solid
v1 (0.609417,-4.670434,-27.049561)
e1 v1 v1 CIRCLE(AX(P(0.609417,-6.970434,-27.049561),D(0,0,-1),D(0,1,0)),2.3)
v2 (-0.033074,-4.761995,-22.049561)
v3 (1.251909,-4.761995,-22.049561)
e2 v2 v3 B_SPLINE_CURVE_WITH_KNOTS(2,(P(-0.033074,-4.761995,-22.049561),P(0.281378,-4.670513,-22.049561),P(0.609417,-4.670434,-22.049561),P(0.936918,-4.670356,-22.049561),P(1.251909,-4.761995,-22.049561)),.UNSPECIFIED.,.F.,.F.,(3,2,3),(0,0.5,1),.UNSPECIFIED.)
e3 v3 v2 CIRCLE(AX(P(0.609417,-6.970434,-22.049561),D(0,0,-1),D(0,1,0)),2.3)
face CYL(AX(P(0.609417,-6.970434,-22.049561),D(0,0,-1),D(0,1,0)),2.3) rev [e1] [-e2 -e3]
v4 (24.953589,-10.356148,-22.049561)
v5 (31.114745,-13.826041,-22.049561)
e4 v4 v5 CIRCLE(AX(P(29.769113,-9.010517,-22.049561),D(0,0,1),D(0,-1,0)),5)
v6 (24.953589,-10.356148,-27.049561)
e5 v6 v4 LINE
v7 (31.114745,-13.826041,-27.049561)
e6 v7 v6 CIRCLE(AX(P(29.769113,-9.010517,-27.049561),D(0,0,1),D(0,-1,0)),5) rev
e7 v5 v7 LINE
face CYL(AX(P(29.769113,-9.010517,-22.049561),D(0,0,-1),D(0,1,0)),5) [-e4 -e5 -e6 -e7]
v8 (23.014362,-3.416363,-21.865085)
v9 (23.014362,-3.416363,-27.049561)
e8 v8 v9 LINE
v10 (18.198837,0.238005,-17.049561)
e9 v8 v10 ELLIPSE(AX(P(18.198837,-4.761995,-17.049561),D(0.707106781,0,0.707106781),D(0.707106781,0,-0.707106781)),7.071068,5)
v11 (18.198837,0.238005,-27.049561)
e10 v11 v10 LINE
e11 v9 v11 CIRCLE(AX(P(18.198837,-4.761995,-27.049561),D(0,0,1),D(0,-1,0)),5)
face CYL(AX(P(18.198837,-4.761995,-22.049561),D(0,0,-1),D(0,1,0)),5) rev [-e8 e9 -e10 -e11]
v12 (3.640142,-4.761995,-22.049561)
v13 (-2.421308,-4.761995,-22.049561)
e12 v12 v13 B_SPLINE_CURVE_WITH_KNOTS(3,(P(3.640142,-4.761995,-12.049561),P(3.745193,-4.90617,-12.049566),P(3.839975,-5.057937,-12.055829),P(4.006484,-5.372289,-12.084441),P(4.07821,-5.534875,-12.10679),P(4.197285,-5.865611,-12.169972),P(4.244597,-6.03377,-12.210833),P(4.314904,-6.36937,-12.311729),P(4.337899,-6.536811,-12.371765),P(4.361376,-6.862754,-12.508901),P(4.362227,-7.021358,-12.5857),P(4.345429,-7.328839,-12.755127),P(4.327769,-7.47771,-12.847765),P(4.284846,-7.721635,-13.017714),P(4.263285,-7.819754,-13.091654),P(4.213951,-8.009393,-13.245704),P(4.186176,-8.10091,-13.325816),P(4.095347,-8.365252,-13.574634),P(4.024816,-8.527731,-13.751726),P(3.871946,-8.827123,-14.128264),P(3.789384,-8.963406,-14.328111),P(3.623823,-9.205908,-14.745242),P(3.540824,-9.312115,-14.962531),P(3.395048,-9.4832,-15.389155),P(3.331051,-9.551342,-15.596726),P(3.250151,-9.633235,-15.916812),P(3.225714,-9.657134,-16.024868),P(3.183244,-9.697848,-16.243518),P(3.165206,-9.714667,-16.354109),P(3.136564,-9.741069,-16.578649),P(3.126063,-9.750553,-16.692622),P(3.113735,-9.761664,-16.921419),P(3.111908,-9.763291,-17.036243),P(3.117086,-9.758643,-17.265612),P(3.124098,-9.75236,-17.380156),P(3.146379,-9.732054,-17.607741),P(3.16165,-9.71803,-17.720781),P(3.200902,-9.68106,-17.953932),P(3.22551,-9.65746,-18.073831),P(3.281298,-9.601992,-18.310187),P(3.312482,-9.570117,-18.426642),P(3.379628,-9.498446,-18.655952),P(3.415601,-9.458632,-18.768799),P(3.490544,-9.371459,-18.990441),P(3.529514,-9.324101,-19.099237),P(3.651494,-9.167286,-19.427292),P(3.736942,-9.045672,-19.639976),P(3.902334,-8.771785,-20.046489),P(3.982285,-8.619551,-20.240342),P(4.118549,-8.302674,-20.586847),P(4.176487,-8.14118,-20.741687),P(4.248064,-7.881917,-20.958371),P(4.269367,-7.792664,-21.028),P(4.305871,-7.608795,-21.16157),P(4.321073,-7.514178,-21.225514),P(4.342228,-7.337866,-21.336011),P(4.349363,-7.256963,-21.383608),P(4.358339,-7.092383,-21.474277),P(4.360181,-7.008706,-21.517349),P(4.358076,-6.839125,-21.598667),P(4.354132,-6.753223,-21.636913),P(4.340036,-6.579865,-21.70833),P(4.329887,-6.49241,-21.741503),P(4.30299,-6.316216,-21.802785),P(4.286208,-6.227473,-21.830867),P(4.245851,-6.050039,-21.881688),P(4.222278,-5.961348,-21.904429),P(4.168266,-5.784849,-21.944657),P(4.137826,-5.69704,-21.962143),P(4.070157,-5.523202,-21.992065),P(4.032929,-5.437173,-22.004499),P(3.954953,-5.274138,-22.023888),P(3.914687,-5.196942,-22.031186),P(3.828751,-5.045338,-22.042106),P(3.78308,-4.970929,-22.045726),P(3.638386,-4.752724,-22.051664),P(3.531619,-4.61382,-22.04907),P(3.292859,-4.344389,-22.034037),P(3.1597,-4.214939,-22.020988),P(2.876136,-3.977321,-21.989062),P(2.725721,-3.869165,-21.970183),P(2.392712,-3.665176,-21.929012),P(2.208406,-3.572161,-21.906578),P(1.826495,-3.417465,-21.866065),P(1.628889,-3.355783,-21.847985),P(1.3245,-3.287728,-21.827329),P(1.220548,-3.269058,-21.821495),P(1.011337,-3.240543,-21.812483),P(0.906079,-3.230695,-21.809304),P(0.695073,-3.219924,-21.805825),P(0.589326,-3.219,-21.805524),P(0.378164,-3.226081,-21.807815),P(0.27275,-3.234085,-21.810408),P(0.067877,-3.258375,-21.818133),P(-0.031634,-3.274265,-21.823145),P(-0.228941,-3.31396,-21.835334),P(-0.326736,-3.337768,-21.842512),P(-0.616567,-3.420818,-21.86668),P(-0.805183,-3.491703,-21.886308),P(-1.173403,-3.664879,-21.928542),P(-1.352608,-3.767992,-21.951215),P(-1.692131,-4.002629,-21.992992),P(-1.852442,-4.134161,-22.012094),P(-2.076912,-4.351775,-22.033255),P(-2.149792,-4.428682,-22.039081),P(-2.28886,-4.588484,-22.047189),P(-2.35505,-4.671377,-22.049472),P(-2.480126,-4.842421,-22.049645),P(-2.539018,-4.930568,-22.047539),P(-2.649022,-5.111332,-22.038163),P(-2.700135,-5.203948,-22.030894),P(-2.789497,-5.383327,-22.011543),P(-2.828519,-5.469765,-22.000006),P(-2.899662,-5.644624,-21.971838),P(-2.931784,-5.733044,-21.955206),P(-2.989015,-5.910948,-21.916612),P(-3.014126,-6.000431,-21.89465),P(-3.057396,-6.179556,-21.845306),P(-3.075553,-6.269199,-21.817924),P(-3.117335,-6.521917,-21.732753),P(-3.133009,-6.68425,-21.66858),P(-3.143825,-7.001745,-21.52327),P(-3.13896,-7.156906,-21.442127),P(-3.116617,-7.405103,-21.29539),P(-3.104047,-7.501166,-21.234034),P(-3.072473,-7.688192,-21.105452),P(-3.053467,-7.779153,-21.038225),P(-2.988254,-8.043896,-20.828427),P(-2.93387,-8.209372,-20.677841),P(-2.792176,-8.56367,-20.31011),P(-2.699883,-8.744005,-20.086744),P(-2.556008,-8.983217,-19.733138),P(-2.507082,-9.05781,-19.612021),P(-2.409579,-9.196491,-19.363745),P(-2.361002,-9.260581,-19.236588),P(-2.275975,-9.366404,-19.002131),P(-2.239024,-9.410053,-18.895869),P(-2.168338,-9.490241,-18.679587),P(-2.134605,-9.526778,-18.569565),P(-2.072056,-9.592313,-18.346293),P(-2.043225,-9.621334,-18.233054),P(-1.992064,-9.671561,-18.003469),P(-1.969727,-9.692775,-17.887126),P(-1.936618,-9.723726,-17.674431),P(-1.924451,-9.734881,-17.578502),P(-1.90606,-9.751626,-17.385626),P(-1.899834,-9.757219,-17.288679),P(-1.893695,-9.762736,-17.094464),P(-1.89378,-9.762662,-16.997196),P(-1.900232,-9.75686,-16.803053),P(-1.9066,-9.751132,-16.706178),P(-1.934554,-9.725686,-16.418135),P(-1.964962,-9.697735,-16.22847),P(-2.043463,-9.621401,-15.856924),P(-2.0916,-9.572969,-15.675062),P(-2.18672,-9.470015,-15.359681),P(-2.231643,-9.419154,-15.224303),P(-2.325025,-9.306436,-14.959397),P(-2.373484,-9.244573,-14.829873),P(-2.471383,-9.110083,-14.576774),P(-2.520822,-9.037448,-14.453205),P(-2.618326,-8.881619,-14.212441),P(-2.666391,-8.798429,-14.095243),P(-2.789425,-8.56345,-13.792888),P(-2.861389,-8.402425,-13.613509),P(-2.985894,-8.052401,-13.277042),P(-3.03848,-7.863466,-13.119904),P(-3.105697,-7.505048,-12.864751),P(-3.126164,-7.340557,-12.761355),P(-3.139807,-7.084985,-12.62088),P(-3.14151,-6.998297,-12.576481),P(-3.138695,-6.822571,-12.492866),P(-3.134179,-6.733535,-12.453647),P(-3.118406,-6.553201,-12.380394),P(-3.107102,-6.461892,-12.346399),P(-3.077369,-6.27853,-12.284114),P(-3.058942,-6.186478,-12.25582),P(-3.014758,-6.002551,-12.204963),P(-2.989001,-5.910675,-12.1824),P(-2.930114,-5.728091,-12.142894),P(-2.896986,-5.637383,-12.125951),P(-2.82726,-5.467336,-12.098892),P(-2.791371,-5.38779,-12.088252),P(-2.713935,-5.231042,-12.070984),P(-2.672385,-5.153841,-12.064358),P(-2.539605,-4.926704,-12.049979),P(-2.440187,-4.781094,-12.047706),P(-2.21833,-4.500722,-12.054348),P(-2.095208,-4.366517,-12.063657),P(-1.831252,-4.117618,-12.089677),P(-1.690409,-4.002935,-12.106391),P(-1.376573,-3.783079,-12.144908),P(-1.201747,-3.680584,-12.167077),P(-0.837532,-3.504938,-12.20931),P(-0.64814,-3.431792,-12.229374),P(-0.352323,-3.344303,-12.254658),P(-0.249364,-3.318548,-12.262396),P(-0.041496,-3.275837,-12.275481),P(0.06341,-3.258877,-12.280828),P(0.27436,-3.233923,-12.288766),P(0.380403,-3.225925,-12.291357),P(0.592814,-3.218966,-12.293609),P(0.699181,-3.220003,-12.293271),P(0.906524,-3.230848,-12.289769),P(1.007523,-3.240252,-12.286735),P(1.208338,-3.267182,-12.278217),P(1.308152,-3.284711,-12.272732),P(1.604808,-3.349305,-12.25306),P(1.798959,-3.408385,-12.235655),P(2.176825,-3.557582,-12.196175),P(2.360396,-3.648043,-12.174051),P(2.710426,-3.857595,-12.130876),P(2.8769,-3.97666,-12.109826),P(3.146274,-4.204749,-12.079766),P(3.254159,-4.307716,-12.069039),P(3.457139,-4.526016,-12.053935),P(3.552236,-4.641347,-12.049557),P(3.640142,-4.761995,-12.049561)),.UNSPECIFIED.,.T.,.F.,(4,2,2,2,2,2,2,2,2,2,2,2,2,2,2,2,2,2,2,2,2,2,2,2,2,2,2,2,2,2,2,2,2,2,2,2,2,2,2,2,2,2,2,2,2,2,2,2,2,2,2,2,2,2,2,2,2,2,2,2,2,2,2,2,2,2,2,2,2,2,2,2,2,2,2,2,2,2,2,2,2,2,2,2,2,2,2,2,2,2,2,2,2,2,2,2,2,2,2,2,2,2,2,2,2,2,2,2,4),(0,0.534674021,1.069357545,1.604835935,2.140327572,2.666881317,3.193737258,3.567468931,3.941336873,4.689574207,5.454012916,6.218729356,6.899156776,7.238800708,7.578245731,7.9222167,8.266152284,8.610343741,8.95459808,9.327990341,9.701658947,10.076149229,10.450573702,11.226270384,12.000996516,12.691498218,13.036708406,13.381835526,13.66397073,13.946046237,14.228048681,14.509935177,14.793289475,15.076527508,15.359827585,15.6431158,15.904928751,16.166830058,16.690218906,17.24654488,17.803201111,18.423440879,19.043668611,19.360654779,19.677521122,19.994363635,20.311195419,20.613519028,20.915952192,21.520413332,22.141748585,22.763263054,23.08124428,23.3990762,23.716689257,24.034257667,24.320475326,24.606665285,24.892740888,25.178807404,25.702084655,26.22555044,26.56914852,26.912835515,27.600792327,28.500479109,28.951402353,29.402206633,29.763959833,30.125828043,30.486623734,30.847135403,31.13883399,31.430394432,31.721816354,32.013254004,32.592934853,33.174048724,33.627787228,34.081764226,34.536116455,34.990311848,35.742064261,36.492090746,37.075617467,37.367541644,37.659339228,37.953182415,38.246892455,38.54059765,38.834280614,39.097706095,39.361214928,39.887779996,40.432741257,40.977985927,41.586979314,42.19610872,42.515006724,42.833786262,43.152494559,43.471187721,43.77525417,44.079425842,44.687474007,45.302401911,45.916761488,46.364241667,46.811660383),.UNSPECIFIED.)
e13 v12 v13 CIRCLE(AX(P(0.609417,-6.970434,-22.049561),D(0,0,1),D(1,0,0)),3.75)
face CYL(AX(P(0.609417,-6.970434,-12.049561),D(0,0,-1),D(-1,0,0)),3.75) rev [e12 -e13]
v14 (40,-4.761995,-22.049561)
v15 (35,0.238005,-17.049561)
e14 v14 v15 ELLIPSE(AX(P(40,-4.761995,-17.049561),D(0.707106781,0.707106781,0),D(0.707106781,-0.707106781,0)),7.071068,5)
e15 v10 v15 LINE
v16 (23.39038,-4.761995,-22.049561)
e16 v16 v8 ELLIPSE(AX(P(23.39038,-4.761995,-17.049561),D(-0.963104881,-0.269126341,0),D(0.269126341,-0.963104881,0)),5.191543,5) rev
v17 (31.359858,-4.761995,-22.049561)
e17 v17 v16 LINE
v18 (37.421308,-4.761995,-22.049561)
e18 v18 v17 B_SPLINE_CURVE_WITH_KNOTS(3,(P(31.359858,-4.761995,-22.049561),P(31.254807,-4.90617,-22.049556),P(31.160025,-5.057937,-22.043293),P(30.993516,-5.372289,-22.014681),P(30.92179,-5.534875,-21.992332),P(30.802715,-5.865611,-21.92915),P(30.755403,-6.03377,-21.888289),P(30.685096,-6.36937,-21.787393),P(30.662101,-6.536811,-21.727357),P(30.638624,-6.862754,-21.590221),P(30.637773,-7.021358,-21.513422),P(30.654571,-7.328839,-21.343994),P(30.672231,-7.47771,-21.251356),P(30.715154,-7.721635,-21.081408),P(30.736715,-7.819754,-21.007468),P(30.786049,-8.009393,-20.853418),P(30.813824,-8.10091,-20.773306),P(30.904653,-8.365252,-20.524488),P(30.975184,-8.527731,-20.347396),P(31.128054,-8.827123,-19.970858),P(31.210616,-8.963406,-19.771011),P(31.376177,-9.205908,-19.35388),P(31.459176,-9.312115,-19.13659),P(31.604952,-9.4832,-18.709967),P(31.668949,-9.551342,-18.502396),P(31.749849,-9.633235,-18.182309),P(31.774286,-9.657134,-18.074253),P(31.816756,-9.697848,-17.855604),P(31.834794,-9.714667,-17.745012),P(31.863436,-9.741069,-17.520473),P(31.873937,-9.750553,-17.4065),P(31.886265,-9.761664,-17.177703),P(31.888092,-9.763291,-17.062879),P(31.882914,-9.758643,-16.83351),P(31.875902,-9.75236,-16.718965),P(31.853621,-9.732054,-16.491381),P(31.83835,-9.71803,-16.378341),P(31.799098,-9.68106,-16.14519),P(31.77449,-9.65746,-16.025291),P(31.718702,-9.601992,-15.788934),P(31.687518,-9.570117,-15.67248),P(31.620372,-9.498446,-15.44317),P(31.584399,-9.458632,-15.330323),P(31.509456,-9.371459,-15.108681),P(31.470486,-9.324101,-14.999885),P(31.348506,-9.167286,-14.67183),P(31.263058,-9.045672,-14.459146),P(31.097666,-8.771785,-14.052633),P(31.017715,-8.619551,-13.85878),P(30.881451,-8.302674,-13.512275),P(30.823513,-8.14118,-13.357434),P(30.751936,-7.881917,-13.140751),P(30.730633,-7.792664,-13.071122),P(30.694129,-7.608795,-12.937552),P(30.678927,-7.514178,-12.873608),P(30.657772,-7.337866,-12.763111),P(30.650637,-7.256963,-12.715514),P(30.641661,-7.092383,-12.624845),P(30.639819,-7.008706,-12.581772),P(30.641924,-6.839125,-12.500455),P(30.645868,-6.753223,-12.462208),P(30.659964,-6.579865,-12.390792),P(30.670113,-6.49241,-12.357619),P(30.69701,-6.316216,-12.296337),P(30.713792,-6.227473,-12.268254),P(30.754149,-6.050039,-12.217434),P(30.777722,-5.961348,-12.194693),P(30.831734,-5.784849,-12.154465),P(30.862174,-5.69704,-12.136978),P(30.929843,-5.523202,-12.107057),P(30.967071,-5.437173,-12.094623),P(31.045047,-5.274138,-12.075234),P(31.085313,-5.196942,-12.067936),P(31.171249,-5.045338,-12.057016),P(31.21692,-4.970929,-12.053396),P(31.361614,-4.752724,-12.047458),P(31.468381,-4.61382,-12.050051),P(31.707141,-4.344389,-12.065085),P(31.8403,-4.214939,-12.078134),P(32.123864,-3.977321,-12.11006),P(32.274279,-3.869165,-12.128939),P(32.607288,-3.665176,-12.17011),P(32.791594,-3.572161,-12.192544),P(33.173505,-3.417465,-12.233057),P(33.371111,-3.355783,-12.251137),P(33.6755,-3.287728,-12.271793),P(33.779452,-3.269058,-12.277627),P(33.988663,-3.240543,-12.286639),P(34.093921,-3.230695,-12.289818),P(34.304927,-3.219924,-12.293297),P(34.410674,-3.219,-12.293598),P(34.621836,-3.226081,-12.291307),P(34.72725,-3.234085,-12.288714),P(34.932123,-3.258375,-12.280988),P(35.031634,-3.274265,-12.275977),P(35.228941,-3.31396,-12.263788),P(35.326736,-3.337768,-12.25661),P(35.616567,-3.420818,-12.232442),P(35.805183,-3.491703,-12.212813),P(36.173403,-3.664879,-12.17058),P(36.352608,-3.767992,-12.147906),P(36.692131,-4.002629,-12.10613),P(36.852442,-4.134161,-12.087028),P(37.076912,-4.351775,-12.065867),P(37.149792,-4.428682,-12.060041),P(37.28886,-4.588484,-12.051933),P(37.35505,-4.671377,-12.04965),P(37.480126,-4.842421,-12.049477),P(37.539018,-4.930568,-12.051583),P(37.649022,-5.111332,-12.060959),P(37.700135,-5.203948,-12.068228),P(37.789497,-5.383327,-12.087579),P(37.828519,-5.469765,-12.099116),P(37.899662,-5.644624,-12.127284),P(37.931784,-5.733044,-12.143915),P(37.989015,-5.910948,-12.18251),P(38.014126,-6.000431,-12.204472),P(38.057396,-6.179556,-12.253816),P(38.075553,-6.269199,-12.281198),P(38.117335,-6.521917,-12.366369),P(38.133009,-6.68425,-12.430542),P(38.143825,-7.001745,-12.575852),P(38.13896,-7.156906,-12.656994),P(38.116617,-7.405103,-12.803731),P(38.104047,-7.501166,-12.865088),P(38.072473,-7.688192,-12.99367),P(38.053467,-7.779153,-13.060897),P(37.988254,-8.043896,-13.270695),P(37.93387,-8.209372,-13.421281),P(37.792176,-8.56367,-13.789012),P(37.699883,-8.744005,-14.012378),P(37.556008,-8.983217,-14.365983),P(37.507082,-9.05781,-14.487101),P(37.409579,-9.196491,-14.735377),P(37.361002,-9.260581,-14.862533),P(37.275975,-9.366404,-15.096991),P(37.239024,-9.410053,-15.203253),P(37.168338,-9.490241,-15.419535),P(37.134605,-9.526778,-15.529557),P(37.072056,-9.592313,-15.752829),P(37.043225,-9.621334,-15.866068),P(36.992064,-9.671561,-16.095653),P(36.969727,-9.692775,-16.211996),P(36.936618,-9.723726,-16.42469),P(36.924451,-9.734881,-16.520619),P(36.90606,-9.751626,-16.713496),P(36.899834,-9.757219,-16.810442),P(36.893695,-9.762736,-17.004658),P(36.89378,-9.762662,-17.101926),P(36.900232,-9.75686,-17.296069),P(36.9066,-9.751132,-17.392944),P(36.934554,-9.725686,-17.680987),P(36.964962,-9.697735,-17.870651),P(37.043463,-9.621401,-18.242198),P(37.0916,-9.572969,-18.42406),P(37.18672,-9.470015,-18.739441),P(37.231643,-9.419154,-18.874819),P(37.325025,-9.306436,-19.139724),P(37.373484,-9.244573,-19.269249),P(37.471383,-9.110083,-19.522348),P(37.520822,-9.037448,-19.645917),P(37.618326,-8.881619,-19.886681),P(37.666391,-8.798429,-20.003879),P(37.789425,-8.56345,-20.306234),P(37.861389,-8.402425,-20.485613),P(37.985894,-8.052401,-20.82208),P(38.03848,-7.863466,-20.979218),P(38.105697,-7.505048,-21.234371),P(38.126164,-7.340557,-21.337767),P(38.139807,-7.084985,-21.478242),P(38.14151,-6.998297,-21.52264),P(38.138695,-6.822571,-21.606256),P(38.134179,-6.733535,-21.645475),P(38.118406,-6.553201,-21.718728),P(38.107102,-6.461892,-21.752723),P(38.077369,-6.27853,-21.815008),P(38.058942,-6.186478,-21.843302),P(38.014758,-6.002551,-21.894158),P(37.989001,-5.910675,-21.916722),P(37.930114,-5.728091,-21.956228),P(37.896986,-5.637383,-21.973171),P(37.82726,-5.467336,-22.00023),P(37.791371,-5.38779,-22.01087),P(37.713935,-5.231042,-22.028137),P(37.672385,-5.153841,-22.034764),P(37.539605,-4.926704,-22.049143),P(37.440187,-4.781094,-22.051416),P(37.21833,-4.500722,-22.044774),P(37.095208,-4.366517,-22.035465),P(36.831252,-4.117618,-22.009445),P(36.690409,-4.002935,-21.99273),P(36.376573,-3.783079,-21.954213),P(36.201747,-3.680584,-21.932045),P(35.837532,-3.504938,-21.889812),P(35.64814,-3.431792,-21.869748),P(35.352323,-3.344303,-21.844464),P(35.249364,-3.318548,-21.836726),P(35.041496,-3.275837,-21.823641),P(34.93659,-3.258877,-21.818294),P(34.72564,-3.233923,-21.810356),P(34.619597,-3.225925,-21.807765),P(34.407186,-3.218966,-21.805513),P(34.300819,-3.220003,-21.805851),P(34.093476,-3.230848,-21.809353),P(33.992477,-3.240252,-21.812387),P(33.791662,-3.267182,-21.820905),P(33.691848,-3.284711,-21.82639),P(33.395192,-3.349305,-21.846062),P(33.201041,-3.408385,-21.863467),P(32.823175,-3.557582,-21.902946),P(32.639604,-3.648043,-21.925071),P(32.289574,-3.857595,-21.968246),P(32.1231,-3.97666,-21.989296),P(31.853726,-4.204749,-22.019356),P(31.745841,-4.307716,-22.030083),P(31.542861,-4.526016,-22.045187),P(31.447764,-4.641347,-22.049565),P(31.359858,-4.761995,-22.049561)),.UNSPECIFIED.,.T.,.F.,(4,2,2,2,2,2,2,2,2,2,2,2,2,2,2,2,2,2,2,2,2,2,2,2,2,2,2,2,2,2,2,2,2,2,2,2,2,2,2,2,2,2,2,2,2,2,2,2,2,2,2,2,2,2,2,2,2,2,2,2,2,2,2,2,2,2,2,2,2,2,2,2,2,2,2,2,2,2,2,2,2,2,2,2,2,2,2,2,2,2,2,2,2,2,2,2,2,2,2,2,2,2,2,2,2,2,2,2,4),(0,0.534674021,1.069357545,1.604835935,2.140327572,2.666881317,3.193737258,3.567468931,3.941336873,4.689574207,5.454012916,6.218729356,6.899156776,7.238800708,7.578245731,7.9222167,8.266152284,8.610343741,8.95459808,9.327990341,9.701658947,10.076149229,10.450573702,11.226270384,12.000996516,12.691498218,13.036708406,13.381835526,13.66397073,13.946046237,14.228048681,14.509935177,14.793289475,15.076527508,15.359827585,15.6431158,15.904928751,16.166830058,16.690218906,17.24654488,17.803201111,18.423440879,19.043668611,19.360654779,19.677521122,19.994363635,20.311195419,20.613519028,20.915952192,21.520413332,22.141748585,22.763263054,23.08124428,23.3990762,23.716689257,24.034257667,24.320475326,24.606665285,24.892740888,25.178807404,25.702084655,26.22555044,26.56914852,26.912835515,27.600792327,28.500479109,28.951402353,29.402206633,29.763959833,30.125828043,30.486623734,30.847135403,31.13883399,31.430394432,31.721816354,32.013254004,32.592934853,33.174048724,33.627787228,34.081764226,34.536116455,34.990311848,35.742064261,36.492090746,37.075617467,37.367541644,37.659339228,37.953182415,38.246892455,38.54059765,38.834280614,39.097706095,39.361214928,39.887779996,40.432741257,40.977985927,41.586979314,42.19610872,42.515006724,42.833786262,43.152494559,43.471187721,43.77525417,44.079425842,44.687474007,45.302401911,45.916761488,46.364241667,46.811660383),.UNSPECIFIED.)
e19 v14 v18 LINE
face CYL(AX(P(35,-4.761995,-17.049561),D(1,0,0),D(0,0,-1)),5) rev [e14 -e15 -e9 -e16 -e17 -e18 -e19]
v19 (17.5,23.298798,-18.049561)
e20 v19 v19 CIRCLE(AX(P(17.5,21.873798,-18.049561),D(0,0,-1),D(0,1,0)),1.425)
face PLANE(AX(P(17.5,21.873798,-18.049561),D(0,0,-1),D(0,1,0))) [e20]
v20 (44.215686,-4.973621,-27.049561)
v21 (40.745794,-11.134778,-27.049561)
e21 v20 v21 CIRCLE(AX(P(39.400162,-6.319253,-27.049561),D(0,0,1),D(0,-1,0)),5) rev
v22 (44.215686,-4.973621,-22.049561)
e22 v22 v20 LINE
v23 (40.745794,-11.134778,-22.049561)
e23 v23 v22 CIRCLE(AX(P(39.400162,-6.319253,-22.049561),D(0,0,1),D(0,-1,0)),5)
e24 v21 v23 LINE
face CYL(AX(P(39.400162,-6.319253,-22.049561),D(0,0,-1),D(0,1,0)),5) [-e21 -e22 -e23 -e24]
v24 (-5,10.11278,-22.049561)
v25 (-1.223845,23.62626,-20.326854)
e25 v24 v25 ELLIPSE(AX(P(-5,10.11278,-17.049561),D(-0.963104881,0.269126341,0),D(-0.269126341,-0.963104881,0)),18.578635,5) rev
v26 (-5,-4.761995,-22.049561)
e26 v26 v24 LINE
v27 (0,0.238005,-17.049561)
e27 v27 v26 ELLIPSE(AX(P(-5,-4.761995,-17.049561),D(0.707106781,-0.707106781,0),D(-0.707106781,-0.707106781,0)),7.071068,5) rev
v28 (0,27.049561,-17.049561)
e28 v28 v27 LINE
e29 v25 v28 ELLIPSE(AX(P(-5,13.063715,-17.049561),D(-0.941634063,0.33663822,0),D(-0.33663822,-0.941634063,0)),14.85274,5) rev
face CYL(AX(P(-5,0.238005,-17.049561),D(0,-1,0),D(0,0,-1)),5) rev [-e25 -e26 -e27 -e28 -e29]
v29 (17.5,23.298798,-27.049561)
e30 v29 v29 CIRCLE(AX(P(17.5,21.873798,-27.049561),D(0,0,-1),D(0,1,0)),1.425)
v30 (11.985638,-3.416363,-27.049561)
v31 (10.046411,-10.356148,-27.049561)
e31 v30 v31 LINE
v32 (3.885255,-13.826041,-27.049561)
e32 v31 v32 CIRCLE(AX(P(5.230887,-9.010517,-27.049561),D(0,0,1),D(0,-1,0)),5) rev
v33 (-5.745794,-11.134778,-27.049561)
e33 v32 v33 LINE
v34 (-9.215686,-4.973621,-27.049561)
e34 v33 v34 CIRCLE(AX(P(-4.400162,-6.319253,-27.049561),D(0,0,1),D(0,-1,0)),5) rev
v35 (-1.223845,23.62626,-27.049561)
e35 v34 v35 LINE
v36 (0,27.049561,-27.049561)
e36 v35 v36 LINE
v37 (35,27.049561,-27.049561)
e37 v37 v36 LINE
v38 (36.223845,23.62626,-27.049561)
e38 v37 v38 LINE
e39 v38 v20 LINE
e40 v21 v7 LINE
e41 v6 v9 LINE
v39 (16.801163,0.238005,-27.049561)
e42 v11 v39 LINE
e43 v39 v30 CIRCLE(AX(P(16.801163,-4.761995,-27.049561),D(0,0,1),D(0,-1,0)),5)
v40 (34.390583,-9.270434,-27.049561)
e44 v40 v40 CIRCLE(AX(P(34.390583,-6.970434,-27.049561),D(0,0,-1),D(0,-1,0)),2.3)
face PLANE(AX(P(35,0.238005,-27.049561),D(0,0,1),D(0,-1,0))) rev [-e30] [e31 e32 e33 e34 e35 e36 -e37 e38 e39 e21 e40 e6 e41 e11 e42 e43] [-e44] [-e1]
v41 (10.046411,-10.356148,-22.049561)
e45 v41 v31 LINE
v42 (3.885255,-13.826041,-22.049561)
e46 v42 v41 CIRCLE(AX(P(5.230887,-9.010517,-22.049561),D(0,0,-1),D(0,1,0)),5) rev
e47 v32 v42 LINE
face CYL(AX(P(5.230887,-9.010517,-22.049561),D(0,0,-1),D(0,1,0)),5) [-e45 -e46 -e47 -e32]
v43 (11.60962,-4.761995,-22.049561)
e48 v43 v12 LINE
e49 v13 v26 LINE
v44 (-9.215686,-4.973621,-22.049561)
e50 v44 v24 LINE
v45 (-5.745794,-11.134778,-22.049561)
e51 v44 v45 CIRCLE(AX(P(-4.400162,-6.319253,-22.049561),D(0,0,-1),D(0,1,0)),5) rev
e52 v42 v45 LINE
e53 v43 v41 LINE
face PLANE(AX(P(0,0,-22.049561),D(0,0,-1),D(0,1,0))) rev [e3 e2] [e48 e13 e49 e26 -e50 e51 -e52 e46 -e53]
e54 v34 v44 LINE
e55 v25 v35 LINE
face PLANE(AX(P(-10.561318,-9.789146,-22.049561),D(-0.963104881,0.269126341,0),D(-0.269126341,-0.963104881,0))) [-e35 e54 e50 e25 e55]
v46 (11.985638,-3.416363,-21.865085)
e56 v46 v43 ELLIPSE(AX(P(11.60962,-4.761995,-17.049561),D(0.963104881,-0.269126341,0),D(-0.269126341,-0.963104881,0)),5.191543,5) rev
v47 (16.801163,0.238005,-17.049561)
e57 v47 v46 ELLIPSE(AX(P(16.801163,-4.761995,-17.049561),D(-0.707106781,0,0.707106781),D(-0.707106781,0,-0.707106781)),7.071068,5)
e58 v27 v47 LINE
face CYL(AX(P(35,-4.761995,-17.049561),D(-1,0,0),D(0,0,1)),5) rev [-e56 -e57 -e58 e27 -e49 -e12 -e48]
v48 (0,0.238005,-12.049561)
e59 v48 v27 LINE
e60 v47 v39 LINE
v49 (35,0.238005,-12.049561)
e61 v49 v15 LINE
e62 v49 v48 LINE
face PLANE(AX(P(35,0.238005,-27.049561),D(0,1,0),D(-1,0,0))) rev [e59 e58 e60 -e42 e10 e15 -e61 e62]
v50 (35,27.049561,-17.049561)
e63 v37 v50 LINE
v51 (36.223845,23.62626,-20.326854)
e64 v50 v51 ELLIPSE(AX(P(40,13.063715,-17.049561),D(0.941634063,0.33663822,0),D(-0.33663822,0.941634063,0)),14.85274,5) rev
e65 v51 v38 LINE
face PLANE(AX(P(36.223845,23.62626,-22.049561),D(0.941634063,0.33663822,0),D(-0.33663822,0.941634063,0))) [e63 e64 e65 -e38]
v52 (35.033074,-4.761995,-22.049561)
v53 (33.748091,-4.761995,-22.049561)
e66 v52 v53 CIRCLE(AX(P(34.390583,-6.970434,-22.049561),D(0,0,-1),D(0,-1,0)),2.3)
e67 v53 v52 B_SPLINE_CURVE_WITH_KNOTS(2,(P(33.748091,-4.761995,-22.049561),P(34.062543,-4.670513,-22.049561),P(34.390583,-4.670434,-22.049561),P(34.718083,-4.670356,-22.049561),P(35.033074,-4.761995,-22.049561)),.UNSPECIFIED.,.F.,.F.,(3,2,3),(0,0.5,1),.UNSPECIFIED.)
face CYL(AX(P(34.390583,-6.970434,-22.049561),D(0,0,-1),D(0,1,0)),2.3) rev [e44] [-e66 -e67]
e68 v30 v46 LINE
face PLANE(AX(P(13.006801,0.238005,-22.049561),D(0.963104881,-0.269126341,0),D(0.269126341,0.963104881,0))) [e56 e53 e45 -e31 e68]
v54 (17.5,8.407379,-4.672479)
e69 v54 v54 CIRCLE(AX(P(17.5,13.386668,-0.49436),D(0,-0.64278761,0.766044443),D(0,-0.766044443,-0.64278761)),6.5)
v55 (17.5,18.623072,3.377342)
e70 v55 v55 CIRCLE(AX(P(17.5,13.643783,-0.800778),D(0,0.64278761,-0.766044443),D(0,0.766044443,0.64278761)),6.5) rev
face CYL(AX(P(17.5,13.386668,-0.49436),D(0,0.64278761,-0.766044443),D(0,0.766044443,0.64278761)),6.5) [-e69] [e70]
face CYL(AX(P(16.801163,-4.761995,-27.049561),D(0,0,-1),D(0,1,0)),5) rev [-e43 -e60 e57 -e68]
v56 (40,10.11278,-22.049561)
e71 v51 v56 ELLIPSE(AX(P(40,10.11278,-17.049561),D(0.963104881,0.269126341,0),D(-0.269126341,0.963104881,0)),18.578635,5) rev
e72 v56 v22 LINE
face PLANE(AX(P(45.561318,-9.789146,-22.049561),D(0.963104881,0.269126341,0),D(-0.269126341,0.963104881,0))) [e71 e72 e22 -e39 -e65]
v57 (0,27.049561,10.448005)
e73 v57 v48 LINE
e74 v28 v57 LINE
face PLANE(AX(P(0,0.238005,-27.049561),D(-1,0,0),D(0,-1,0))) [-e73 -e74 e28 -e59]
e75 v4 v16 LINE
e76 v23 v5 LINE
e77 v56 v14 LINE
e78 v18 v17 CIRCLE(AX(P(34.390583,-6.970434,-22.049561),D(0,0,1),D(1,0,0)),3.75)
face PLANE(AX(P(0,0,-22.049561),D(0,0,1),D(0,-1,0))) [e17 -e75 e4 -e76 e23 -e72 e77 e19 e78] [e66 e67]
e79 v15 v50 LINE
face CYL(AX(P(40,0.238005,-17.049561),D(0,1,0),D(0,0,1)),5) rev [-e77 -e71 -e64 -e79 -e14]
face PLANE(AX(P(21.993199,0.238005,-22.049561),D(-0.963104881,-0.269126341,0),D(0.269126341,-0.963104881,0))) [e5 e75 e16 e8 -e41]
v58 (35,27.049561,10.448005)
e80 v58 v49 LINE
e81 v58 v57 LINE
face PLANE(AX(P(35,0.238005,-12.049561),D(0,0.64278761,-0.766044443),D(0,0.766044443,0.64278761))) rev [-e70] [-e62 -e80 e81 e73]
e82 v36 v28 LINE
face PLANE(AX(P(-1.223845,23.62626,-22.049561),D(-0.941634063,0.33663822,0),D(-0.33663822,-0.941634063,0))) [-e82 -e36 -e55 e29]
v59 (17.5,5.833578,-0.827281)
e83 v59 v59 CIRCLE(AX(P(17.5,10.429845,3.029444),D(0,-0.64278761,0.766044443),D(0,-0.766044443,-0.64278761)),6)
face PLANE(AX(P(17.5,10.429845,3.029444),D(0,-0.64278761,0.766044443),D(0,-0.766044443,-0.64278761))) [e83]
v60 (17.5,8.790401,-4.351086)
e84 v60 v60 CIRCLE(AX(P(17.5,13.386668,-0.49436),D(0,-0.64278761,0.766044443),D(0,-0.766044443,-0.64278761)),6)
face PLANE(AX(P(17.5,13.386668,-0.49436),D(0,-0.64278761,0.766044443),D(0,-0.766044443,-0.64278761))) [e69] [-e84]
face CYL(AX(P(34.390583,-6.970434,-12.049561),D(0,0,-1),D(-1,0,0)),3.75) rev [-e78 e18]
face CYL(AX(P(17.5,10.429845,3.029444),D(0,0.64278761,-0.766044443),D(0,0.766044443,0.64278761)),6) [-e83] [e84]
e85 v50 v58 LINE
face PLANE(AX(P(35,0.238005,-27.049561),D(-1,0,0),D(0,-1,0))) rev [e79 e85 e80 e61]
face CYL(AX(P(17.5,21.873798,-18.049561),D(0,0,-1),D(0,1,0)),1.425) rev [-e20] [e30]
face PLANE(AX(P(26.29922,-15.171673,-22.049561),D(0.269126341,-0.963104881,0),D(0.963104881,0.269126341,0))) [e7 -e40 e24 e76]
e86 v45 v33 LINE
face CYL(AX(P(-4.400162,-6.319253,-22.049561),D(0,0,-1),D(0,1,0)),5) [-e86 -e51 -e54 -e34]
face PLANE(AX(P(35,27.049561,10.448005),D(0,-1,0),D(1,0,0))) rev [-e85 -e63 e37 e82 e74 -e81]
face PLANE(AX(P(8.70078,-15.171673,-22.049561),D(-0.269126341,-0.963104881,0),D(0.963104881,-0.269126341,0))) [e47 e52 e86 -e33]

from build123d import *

# Parameters (mm, degrees)
AUFSATZ_LINEAR_AUSTRAGEN1_DEPTH    = 35
SKIZZE3_R                          = 6
AUFSATZ_LINEAR_AUSTRAGEN2_DEPTH    = 5
SKIZZE4_R                          = 6.5
AUFSATZ_LINEAR_AUSTRAGEN3_DEPTH    = 0.4
K_RPER_VERSCHIEBEN_KOPIEREN1_ANGLE = 90
SKIZZE9_R                          = 2.3
AUFSATZ_LINEAR_AUSTRAGEN4_DEPTH    = 5
VERRUNDUNG1_R                      = 5
SKIZZE11_R                         = 3.75
SCHNITT_LINEAR_AUSTRAGEN2_DEPTH    = 10
SKIZZE12_R                         = 1.425
SCHNITT_LINEAR_AUSTRAGEN3_DEPTH    = 9


with BuildPart() as part:
    # Skizze1 → Aufsatz-Linear austragen1 (new body)
    with BuildSketch(Plane(origin=(0, 0, 0), x_dir=(0, 0, -1), z_dir=(1, 0, 0))):
        Polygon((0, 0), (26.811555509, 0), (26.811555509, 37.497566339), (0, 15), align=None)
    extrude(amount=AUFSATZ_LINEAR_AUSTRAGEN1_DEPTH)

    # Skizze3 → Aufsatz-Linear austragen2 (add)
    with BuildSketch(Plane(origin=(0, 8.802361333, 7.386058148), x_dir=(1, 0, 0), z_dir=(0, 0.7660444431189768, 0.642787609686541))):
        with Locations(Location((17.5, 27.141814145, 0), (0, 0, 90))):
            Circle(SKIZZE3_R)
    extrude(amount=AUFSATZ_LINEAR_AUSTRAGEN2_DEPTH)

    # Skizze4 → Aufsatz-Linear austragen3 (add)
    with BuildSketch(Plane(origin=(0, 8.802361333, 7.386058148), x_dir=(1, 0, 0), z_dir=(0, 0.7660444431189767, 0.6427876096865409))):
        with Locations(Location((17.5, 27.141814145, 0), (0, 0, 90))):
            Circle(SKIZZE4_R)
    extrude(amount=AUFSATZ_LINEAR_AUSTRAGEN3_DEPTH)


with BuildPart() as part_1:
    # Körper-Verschieben/Kopieren1: moved
    add(part.part.rotate(Axis((0, 13.64378317, -13.405777755), (1, 0, 0)), K_RPER_VERSCHIEBEN_KOPIEREN1_ANGLE))

    # Skizze9 → Aufsatz-Linear austragen4 (add)
    # profile 1 of 2: a face of its own
    with BuildSketch(Plane(origin=(0, 0, -27.049560924), x_dir=(-1, 0, 0), z_dir=(0, 0, -1))):
        Polygon((-13.006801175, 0.238005415), (-8.700779715, -15.171672686), (10.561317912, -9.789145862), (1.223844944, 23.626259531), (0, 27.049560924), (0, 0.238005415), align=None)
        with Locations(Location((-0.609417277, -6.970434083, 0), (0, 0, 90))):
            Circle(SKIZZE9_R, mode=Mode.SUBTRACT)
    # profile 2 of 2: a face of its own
    with BuildSketch(Plane(origin=(0, 0, -27.049560924), x_dir=(-1, 0, 0), z_dir=(0, 0, -1))):
        Polygon((-45.561317912, -9.789145862), (-36.223844944, 23.626259531), (-35, 27.049560924), (-35, 0.238005415), (-21.993198825, 0.238005415), (-26.299220285, -15.171672686), align=None)
        with Locations(Location((-34.390582723, -6.970434083, 0), (0, 0, 270))):
            Circle(SKIZZE9_R, mode=Mode.SUBTRACT)
    extrude(amount=-AUFSATZ_LINEAR_AUSTRAGEN4_DEPTH)

    # Verrundung1
    # the kernel refuses this fillet: 5 mm, written as the material it adds along each edge
    with BuildSketch(Plane(origin=(35, 27.049560924, -22.049560924), x_dir=(1, 0, 0), z_dir=(0, -1, 0))) as verrundung1_piece_1_section:
        with BuildLine():
            CenterArc((VERRUNDUNG1_R, VERRUNDUNG1_R), VERRUNDUNG1_R, 180, 90)
            Line((0, VERRUNDUNG1_R), (-VERRUNDUNG1_R * 0.02, VERRUNDUNG1_R))
            Line((-VERRUNDUNG1_R * 0.02, VERRUNDUNG1_R), (-VERRUNDUNG1_R * 0.02, -VERRUNDUNG1_R * 0.02))
            Line((-VERRUNDUNG1_R * 0.02, -VERRUNDUNG1_R * 0.02), (VERRUNDUNG1_R, -VERRUNDUNG1_R * 0.02))
            Line((VERRUNDUNG1_R, -VERRUNDUNG1_R * 0.02), (VERRUNDUNG1_R, 0))
        make_face()
    verrundung1_piece_1 = extrude(amount=26.811555509, mode=Mode.PRIVATE)
    verrundung1_piece_1 = split(verrundung1_piece_1, bisect_by=Plane(origin=(39.17481741, 13.065806869, -20.82374956), z_dir=(-0.9631048813334838, -0.2691263412444353, -1.6244750072279728e-13)), keep=Keep.TOP, mode=Mode.PRIVATE)
    verrundung1_piece_1 = split(verrundung1_piece_1, bisect_by=Plane(origin=(39.826476164, 13.549090416, -20.82374956), z_dir=(-0.9416340631335743, -0.3366382199729496, -2.0319838344143382e-13)), keep=Keep.TOP, mode=Mode.PRIVATE)
    add(verrundung1_piece_1)
    with BuildSketch(Plane(origin=(35, 0.238005415, -22.049560924), x_dir=(0, 0, 1), z_dir=(-1, 0, 0))) as verrundung1_piece_2_section:
        with BuildLine():
            CenterArc((VERRUNDUNG1_R, -VERRUNDUNG1_R), VERRUNDUNG1_R, 90, 90)
            Line((0, -VERRUNDUNG1_R), (-VERRUNDUNG1_R * 0.02, -VERRUNDUNG1_R))
            Line((-VERRUNDUNG1_R * 0.02, -VERRUNDUNG1_R), (-VERRUNDUNG1_R * 0.02, VERRUNDUNG1_R * 0.02))
            Line((-VERRUNDUNG1_R * 0.02, VERRUNDUNG1_R * 0.02), (VERRUNDUNG1_R, VERRUNDUNG1_R * 0.02))
            Line((VERRUNDUNG1_R, VERRUNDUNG1_R * 0.02), (VERRUNDUNG1_R, 0))
        make_face()
    verrundung1_piece_2 = extrude(amount=25.506801175, mode=Mode.PRIVATE)
    verrundung1_piece_2 = split(verrundung1_piece_2, bisect_by=Plane(origin=(22.762065147, -2.513486336, -20.902354356), z_dir=(0.9631048813334842, 0.2691263412444339, 1.6244750072279647e-13)), keep=Keep.TOP, mode=Mode.PRIVATE)
    verrundung1_piece_2 = verrundung1_piece_2 - Plane(origin=(34.390582723, -6.970434083, -20.902354356), x_dir=(0, -1, 0), z_dir=(0, 0, -1)) * Cylinder(2.3, 72, mode=Mode.PRIVATE)
    add(verrundung1_piece_2)
    with BuildSketch(Plane(origin=(35, 0.238005415, -22.049560924), x_dir=(0, 0, 1), z_dir=(-1, 0, 0))) as verrundung1_piece_3_section:
        with BuildLine():
            CenterArc((VERRUNDUNG1_R, -VERRUNDUNG1_R), VERRUNDUNG1_R, 90, 90)
            Line((0, -VERRUNDUNG1_R), (-VERRUNDUNG1_R * 0.02, -VERRUNDUNG1_R))
            Line((-VERRUNDUNG1_R * 0.02, -VERRUNDUNG1_R), (-VERRUNDUNG1_R * 0.02, VERRUNDUNG1_R * 0.02))
            Line((-VERRUNDUNG1_R * 0.02, VERRUNDUNG1_R * 0.02), (VERRUNDUNG1_R, VERRUNDUNG1_R * 0.02))
            Line((VERRUNDUNG1_R, VERRUNDUNG1_R * 0.02), (VERRUNDUNG1_R, 0))
        make_face()
    verrundung1_piece_3 = extrude(amount=25.506801175, mode=Mode.PRIVATE)
    verrundung1_piece_3 = split(verrundung1_piece_3, bisect_by=Plane(origin=(12.602046932, -1.210462189, -20.857593889), z_dir=(-0.9631048813334842, 0.26912634124443413, 1.6244750072279654e-13)), keep=Keep.TOP, mode=Mode.PRIVATE)
    add(verrundung1_piece_3)
    with BuildSketch(Plane(origin=(0, 0.238005415, -22.049560924), x_dir=(0, 0, 1), z_dir=(1, 0, 0))) as verrundung1_piece_4_section:
        with BuildLine():
            CenterArc((VERRUNDUNG1_R, VERRUNDUNG1_R), VERRUNDUNG1_R, 180, 90)
            Line((0, VERRUNDUNG1_R), (-VERRUNDUNG1_R * 0.02, VERRUNDUNG1_R))
            Line((-VERRUNDUNG1_R * 0.02, VERRUNDUNG1_R), (-VERRUNDUNG1_R * 0.02, -VERRUNDUNG1_R * 0.02))
            Line((-VERRUNDUNG1_R * 0.02, -VERRUNDUNG1_R * 0.02), (VERRUNDUNG1_R, -VERRUNDUNG1_R * 0.02))
            Line((VERRUNDUNG1_R, -VERRUNDUNG1_R * 0.02), (VERRUNDUNG1_R, 0))
        make_face()
    verrundung1_piece_4 = extrude(amount=25.506801175, mode=Mode.PRIVATE)
    verrundung1_piece_4 = split(verrundung1_piece_4, bisect_by=Plane(origin=(12.237934855, -2.513486327, -20.902354361), z_dir=(-0.9631048813334842, 0.26912634124443413, 1.6244750072279654e-13)), keep=Keep.TOP, mode=Mode.PRIVATE)
    verrundung1_piece_4 = verrundung1_piece_4 - Plane(origin=(0.609417277, -6.970434083, -20.902354361), x_dir=(0, 1, 0), z_dir=(0, 0, -1)) * Cylinder(2.3, 72, mode=Mode.PRIVATE)
    add(verrundung1_piece_4)
    with BuildSketch(Plane(origin=(0, 0.238005415, -22.049560924), x_dir=(0, 0, 1), z_dir=(1, 0, 0))) as verrundung1_piece_5_section:
        with BuildLine():
            CenterArc((VERRUNDUNG1_R, VERRUNDUNG1_R), VERRUNDUNG1_R, 180, 90)
            Line((0, VERRUNDUNG1_R), (-VERRUNDUNG1_R * 0.02, VERRUNDUNG1_R))
            Line((-VERRUNDUNG1_R * 0.02, VERRUNDUNG1_R), (-VERRUNDUNG1_R * 0.02, -VERRUNDUNG1_R * 0.02))
            Line((-VERRUNDUNG1_R * 0.02, -VERRUNDUNG1_R * 0.02), (VERRUNDUNG1_R, -VERRUNDUNG1_R * 0.02))
            Line((VERRUNDUNG1_R, -VERRUNDUNG1_R * 0.02), (VERRUNDUNG1_R, 0))
        make_face()
    verrundung1_piece_5 = extrude(amount=25.506801175, mode=Mode.PRIVATE)
    verrundung1_piece_5 = split(verrundung1_piece_5, bisect_by=Plane(origin=(22.397953068, -1.210462189, -20.857593889), z_dir=(0.9631048813334842, 0.2691263412444339, 1.6244750072279647e-13)), keep=Keep.TOP, mode=Mode.PRIVATE)
    add(verrundung1_piece_5)
    with BuildSketch(Plane(origin=(0, 27.049560924, -22.049560924), x_dir=(0, 0, 1), z_dir=(0, -1, 0))) as verrundung1_piece_6_section:
        with BuildLine():
            CenterArc((VERRUNDUNG1_R, VERRUNDUNG1_R), VERRUNDUNG1_R, 180, 90)
            Line((0, VERRUNDUNG1_R), (-VERRUNDUNG1_R * 0.02, VERRUNDUNG1_R))
            Line((-VERRUNDUNG1_R * 0.02, VERRUNDUNG1_R), (-VERRUNDUNG1_R * 0.02, -VERRUNDUNG1_R * 0.02))
            Line((-VERRUNDUNG1_R * 0.02, -VERRUNDUNG1_R * 0.02), (VERRUNDUNG1_R, -VERRUNDUNG1_R * 0.02))
            Line((VERRUNDUNG1_R, -VERRUNDUNG1_R * 0.02), (VERRUNDUNG1_R, 0))
        make_face()
    verrundung1_piece_6 = extrude(amount=26.811555509, mode=Mode.PRIVATE)
    verrundung1_piece_6 = split(verrundung1_piece_6, bisect_by=Plane(origin=(-4.17481741, 13.06580687, -20.82374956), z_dir=(0.9631048813334837, -0.26912634124443535, -1.6244750072279728e-13)), keep=Keep.TOP, mode=Mode.PRIVATE)
    verrundung1_piece_6 = split(verrundung1_piece_6, bisect_by=Plane(origin=(-4.826476163, 13.549090417, -20.82374956), z_dir=(0.9416340631335748, -0.3366382199729482, -2.0319838344143293e-13)), keep=Keep.TOP, mode=Mode.PRIVATE)
    add(verrundung1_piece_6)
    with BuildSketch(Plane(origin=(21.993198825, 0.238005415, -27.049560924), x_dir=(-1, 0, 0), z_dir=(0, 0, 1))) as verrundung1_piece_7:
        with BuildLine():
            CenterArc((VERRUNDUNG1_R * 0.758872343938, VERRUNDUNG1_R), VERRUNDUNG1_R, 195.612285688, 74.387714312)
            Line((-VERRUNDUNG1_R * 0.204232537396, VERRUNDUNG1_R * 0.730873658756), (-VERRUNDUNG1_R * 0.223494635022, VERRUNDUNG1_R * 0.725491131931))
            Line((-VERRUNDUNG1_R * 0.223494635022, VERRUNDUNG1_R * 0.725491131931), (-VERRUNDUNG1_R * 0.0151774468788, -VERRUNDUNG1_R * 0.02))
            Line((-VERRUNDUNG1_R * 0.0151774468788, -VERRUNDUNG1_R * 0.02), (VERRUNDUNG1_R * 0.758872343938, -VERRUNDUNG1_R * 0.02))
            Line((VERRUNDUNG1_R * 0.758872343938, -VERRUNDUNG1_R * 0.02), (VERRUNDUNG1_R * 0.758872343938, 0))
        make_face()
    extrude(amount=5)
    with BuildSketch(Plane(origin=(13.006801175, 0.238005415, -27.049560924), x_dir=(1, 0, 0), z_dir=(0, 0, 1))) as verrundung1_piece_8:
        with BuildLine():
            CenterArc((VERRUNDUNG1_R * 0.758872343938, -VERRUNDUNG1_R), VERRUNDUNG1_R, 90, 74.387714312)
            Line((-VERRUNDUNG1_R * 0.204232537396, -VERRUNDUNG1_R * 0.730873658756), (-VERRUNDUNG1_R * 0.223494635022, -VERRUNDUNG1_R * 0.725491131931))
            Line((-VERRUNDUNG1_R * 0.223494635022, -VERRUNDUNG1_R * 0.725491131931), (-VERRUNDUNG1_R * 0.0151774468788, VERRUNDUNG1_R * 0.02))
            Line((-VERRUNDUNG1_R * 0.0151774468788, VERRUNDUNG1_R * 0.02), (VERRUNDUNG1_R * 0.758872343938, VERRUNDUNG1_R * 0.02))
            Line((VERRUNDUNG1_R * 0.758872343938, VERRUNDUNG1_R * 0.02), (VERRUNDUNG1_R * 0.758872343938, 0))
        make_face()
    extrude(amount=5)
    with BuildSketch(Plane(origin=(47.5, 0.238005415, -22.049560924), x_dir=(0, 0, 1), z_dir=(-1, 0, 0))) as verrundung1_piece_9a_section:
        with BuildLine():
            CenterArc((VERRUNDUNG1_R, -VERRUNDUNG1_R), VERRUNDUNG1_R, 90, 90)
            Line((0, -VERRUNDUNG1_R), (-VERRUNDUNG1_R * 0.02, -VERRUNDUNG1_R))
            Line((-VERRUNDUNG1_R * 0.02, -VERRUNDUNG1_R), (-VERRUNDUNG1_R * 0.02, VERRUNDUNG1_R * 0.02))
            Line((-VERRUNDUNG1_R * 0.02, VERRUNDUNG1_R * 0.02), (VERRUNDUNG1_R, VERRUNDUNG1_R * 0.02))
            Line((VERRUNDUNG1_R, VERRUNDUNG1_R * 0.02), (VERRUNDUNG1_R, 0))
        make_face()
    verrundung1_piece_9a = extrude(amount=38.006801175, mode=Mode.PRIVATE)
    verrundung1_piece_9a = split(verrundung1_piece_9a, bisect_by=Plane(origin=(35, -0.934173805, -20.941336544), z_dir=(1, 0, 0)), keep=Keep.TOP, mode=Mode.PRIVATE)
    verrundung1_piece_9a = split(verrundung1_piece_9a, bisect_by=Plane(origin=(42.794054861, 0.1138779, -20.941336544), z_dir=(-0.9631048813334838, -0.2691263412444353, -1.6244750072279728e-13)), keep=Keep.TOP, mode=Mode.PRIVATE)
    with BuildSketch(Plane(origin=(35, 27.049560924, -22.049560924), x_dir=(1, 0, 0), z_dir=(0, -1, 0))) as verrundung1_piece_9b_section:
        with BuildLine():
            CenterArc((VERRUNDUNG1_R, VERRUNDUNG1_R), VERRUNDUNG1_R, 180, 90)
            Line((0, VERRUNDUNG1_R), (-VERRUNDUNG1_R * 0.02, VERRUNDUNG1_R))
            Line((-VERRUNDUNG1_R * 0.02, VERRUNDUNG1_R), (-VERRUNDUNG1_R * 0.02, -VERRUNDUNG1_R * 0.02))
            Line((-VERRUNDUNG1_R * 0.02, -VERRUNDUNG1_R * 0.02), (VERRUNDUNG1_R, -VERRUNDUNG1_R * 0.02))
            Line((VERRUNDUNG1_R, -VERRUNDUNG1_R * 0.02), (VERRUNDUNG1_R, 0))
        make_face()
    verrundung1_piece_9b = extrude(amount=39.311555509, mode=Mode.PRIVATE)
    verrundung1_piece_9b = split(verrundung1_piece_9b, bisect_by=Plane(origin=(38.695669586, 0.238005415, -21.917388299), z_dir=(0, -1, 0)), keep=Keep.TOP, mode=Mode.PRIVATE)
    verrundung1_piece_9b = split(verrundung1_piece_9b, bisect_by=Plane(origin=(39.091980364, -11.596912781, -21.917388299), z_dir=(-0.2691263412444344, 0.963104881333484, 5.813402738026697e-13)), keep=Keep.TOP, mode=Mode.PRIVATE)
    verrundung1_piece_9b = verrundung1_piece_9b - Plane(origin=(34.390582723, -6.970434083, -21.917388299), x_dir=(0, -1, 0), z_dir=(0, 0, -1)) * Cylinder(2.3, 99, mode=Mode.PRIVATE)
    verrundung1_piece_9 = verrundung1_piece_9a & verrundung1_piece_9b
    add(verrundung1_piece_9)
    with BuildSketch(Plane(origin=(21.993198825, 0.238005415, -27.049560924), x_dir=(-1, 0, 0), z_dir=(0, 0, 1))) as verrundung1_piece_10a_section:
        with BuildLine():
            CenterArc((VERRUNDUNG1_R * 0.758872343938, VERRUNDUNG1_R), VERRUNDUNG1_R, 195.612285688, 74.387714312)
            Line((-VERRUNDUNG1_R * 0.204232537396, VERRUNDUNG1_R * 0.730873658756), (-VERRUNDUNG1_R * 0.223494635022, VERRUNDUNG1_R * 0.725491131931))
            Line((-VERRUNDUNG1_R * 0.223494635022, VERRUNDUNG1_R * 0.725491131931), (-VERRUNDUNG1_R * 0.0151774468788, -VERRUNDUNG1_R * 0.02))
            Line((-VERRUNDUNG1_R * 0.0151774468788, -VERRUNDUNG1_R * 0.02), (VERRUNDUNG1_R * 0.758872343938, -VERRUNDUNG1_R * 0.02))
            Line((VERRUNDUNG1_R * 0.758872343938, -VERRUNDUNG1_R * 0.02), (VERRUNDUNG1_R * 0.758872343938, 0))
        make_face()
    verrundung1_piece_10a = extrude(amount=14.485904299, mode=Mode.PRIVATE)
    verrundung1_piece_10a = split(verrundung1_piece_10a, bisect_by=Plane(origin=(21.381573581, -0.567960502, -22.049560924), z_dir=(0, 0, 1)), keep=Keep.TOP, mode=Mode.PRIVATE)
    with BuildSketch(Plane(origin=(35, 0.238005415, -22.049560924), x_dir=(0, 0, 1), z_dir=(-1, 0, 0))) as verrundung1_piece_10b_section:
        with BuildLine():
            CenterArc((VERRUNDUNG1_R, -VERRUNDUNG1_R), VERRUNDUNG1_R, 90, 90)
            Line((0, -VERRUNDUNG1_R), (-VERRUNDUNG1_R * 0.02, -VERRUNDUNG1_R))
            Line((-VERRUNDUNG1_R * 0.02, -VERRUNDUNG1_R), (-VERRUNDUNG1_R * 0.02, VERRUNDUNG1_R * 0.02))
            Line((-VERRUNDUNG1_R * 0.02, VERRUNDUNG1_R * 0.02), (VERRUNDUNG1_R, VERRUNDUNG1_R * 0.02))
            Line((VERRUNDUNG1_R, VERRUNDUNG1_R * 0.02), (VERRUNDUNG1_R, 0))
        make_face()
    verrundung1_piece_10b = extrude(amount=25.506801175, mode=Mode.PRIVATE)
    verrundung1_piece_10b = split(verrundung1_piece_10b, bisect_by=Plane(origin=(13.021336565, 0.290022269, -20.957466714), z_dir=(0.9631048813334842, -0.26912634124443413, -1.6244750072279654e-13)), keep=Keep.TOP, mode=Mode.PRIVATE)
    verrundung1_piece_10b = split(verrundung1_piece_10b, bisect_by=Plane(origin=(21.978663435, 0.290022269, -20.957466714), z_dir=(-0.9631048813334842, -0.2691263412444339, -1.6244750072279647e-13)), keep=Keep.TOP, mode=Mode.PRIVATE)
    verrundung1_piece_10 = verrundung1_piece_10a & verrundung1_piece_10b
    add(verrundung1_piece_10)
    with BuildSketch(Plane(origin=(-12.5, 0.238005415, -22.049560924), x_dir=(0, 0, 1), z_dir=(1, 0, 0))) as verrundung1_piece_11a_section:
        with BuildLine():
            CenterArc((VERRUNDUNG1_R, VERRUNDUNG1_R), VERRUNDUNG1_R, 180, 90)
            Line((0, VERRUNDUNG1_R), (-VERRUNDUNG1_R * 0.02, VERRUNDUNG1_R))
            Line((-VERRUNDUNG1_R * 0.02, VERRUNDUNG1_R), (-VERRUNDUNG1_R * 0.02, -VERRUNDUNG1_R * 0.02))
            Line((-VERRUNDUNG1_R * 0.02, -VERRUNDUNG1_R * 0.02), (VERRUNDUNG1_R, -VERRUNDUNG1_R * 0.02))
            Line((VERRUNDUNG1_R, -VERRUNDUNG1_R * 0.02), (VERRUNDUNG1_R, 0))
        make_face()
    verrundung1_piece_11a = extrude(amount=38.006801175, mode=Mode.PRIVATE)
    verrundung1_piece_11a = split(verrundung1_piece_11a, bisect_by=Plane(origin=(0, -0.934173805, -20.941336544), z_dir=(-1, 0, 0)), keep=Keep.TOP, mode=Mode.PRIVATE)
    verrundung1_piece_11a = split(verrundung1_piece_11a, bisect_by=Plane(origin=(-7.794054861, 0.1138779, -20.941336544), z_dir=(0.9631048813334837, -0.26912634124443535, -1.6244750072279728e-13)), keep=Keep.TOP, mode=Mode.PRIVATE)
    with BuildSketch(Plane(origin=(0, 27.049560924, -22.049560924), x_dir=(0, 0, 1), z_dir=(0, -1, 0))) as verrundung1_piece_11b_section:
        with BuildLine():
            CenterArc((VERRUNDUNG1_R, VERRUNDUNG1_R), VERRUNDUNG1_R, 180, 90)
            Line((0, VERRUNDUNG1_R), (-VERRUNDUNG1_R * 0.02, VERRUNDUNG1_R))
            Line((-VERRUNDUNG1_R * 0.02, VERRUNDUNG1_R), (-VERRUNDUNG1_R * 0.02, -VERRUNDUNG1_R * 0.02))
            Line((-VERRUNDUNG1_R * 0.02, -VERRUNDUNG1_R * 0.02), (VERRUNDUNG1_R, -VERRUNDUNG1_R * 0.02))
            Line((VERRUNDUNG1_R, -VERRUNDUNG1_R * 0.02), (VERRUNDUNG1_R, 0))
        make_face()
    verrundung1_piece_11b = extrude(amount=39.311555509, mode=Mode.PRIVATE)
    verrundung1_piece_11b = split(verrundung1_piece_11b, bisect_by=Plane(origin=(-0.132172609, 0.238005415, -18.353891343), z_dir=(0, -1, 0)), keep=Keep.TOP, mode=Mode.PRIVATE)
    verrundung1_piece_11b = split(verrundung1_piece_11b, bisect_by=Plane(origin=(-0.786583865, -12.520560126, -18.353891343), z_dir=(0.2691263412444344, 0.963104881333484, 5.813402738026697e-13)), keep=Keep.TOP, mode=Mode.PRIVATE)
    verrundung1_piece_11b = verrundung1_piece_11b - Plane(origin=(0.609417277, -6.970434083, -18.353891343), x_dir=(0, 1, 0), z_dir=(0, 0, -1)) * Cylinder(2.3, 99, mode=Mode.PRIVATE)
    verrundung1_piece_11 = verrundung1_piece_11a & verrundung1_piece_11b
    add(verrundung1_piece_11)
    with BuildSketch(Plane(origin=(0, 0.238005415, -22.049560924), x_dir=(0, 0, 1), z_dir=(1, 0, 0))) as verrundung1_piece_12a_section:
        with BuildLine():
            CenterArc((VERRUNDUNG1_R, VERRUNDUNG1_R), VERRUNDUNG1_R, 180, 90)
            Line((0, VERRUNDUNG1_R), (-VERRUNDUNG1_R * 0.02, VERRUNDUNG1_R))
            Line((-VERRUNDUNG1_R * 0.02, VERRUNDUNG1_R), (-VERRUNDUNG1_R * 0.02, -VERRUNDUNG1_R * 0.02))
            Line((-VERRUNDUNG1_R * 0.02, -VERRUNDUNG1_R * 0.02), (VERRUNDUNG1_R, -VERRUNDUNG1_R * 0.02))
            Line((VERRUNDUNG1_R, -VERRUNDUNG1_R * 0.02), (VERRUNDUNG1_R, 0))
        make_face()
    verrundung1_piece_12a = extrude(amount=25.506801175, mode=Mode.PRIVATE)
    verrundung1_piece_12a = split(verrundung1_piece_12a, bisect_by=Plane(origin=(13.021336565, 0.290022269, -20.957466714), z_dir=(0.9631048813334842, -0.26912634124443413, -1.6244750072279654e-13)), keep=Keep.TOP, mode=Mode.PRIVATE)
    verrundung1_piece_12a = split(verrundung1_piece_12a, bisect_by=Plane(origin=(21.978663435, 0.290022269, -20.957466714), z_dir=(-0.9631048813334842, -0.2691263412444339, -1.6244750072279647e-13)), keep=Keep.TOP, mode=Mode.PRIVATE)
    with BuildSketch(Plane(origin=(13.006801175, 0.238005415, -27.049560924), x_dir=(1, 0, 0), z_dir=(0, 0, 1))) as verrundung1_piece_12b_section:
        with BuildLine():
            CenterArc((VERRUNDUNG1_R * 0.758872343938, -VERRUNDUNG1_R), VERRUNDUNG1_R, 90, 74.387714312)
            Line((-VERRUNDUNG1_R * 0.204232537396, -VERRUNDUNG1_R * 0.730873658756), (-VERRUNDUNG1_R * 0.223494635022, -VERRUNDUNG1_R * 0.725491131931))
            Line((-VERRUNDUNG1_R * 0.223494635022, -VERRUNDUNG1_R * 0.725491131931), (-VERRUNDUNG1_R * 0.0151774468788, VERRUNDUNG1_R * 0.02))
            Line((-VERRUNDUNG1_R * 0.0151774468788, VERRUNDUNG1_R * 0.02), (VERRUNDUNG1_R * 0.758872343938, VERRUNDUNG1_R * 0.02))
            Line((VERRUNDUNG1_R * 0.758872343938, VERRUNDUNG1_R * 0.02), (VERRUNDUNG1_R * 0.758872343938, 0))
        make_face()
    verrundung1_piece_12b = extrude(amount=14.485904299, mode=Mode.PRIVATE)
    verrundung1_piece_12b = split(verrundung1_piece_12b, bisect_by=Plane(origin=(13.618426419, -0.567960502, -22.049560924), z_dir=(0, 0, 1)), keep=Keep.TOP, mode=Mode.PRIVATE)
    verrundung1_piece_12 = verrundung1_piece_12a & verrundung1_piece_12b
    add(verrundung1_piece_12)
    # the kernel refuses this fillet: 5 mm, written as the material it takes off along each edge
    with BuildSketch(Plane(origin=(45.561317912, -9.789145861, -39.549560924), x_dir=(-0.2691263412444356, 0.9631048813334836, 5.813402738026695e-13), z_dir=(0, 0, 1)), Plane(origin=(26.299220285, -15.171672686, -39.549560924), x_dir=(0.9631048813334839, 0.2691263412444345, 1.6244750072279685e-13), z_dir=(0, 0, 1)), Plane(origin=(8.700779715, -15.171672686, -39.549560924), x_dir=(0.2691263412444342, 0.9631048813334839, 5.813402738026696e-13), z_dir=(0, 0, 1)), Plane(origin=(-10.561317912, -9.789145861, -39.549560924), x_dir=(0.9631048813334839, -0.2691263412444342, -1.6244750072279662e-13), z_dir=(0, 0, 1))) as verrundung1_2_piece_1:
        with BuildLine():
            CenterArc((VERRUNDUNG1_R, VERRUNDUNG1_R), VERRUNDUNG1_R, 180, 90)
            Line((0, VERRUNDUNG1_R), (-VERRUNDUNG1_R * 0.02, VERRUNDUNG1_R))
            Line((-VERRUNDUNG1_R * 0.02, VERRUNDUNG1_R), (-VERRUNDUNG1_R * 0.02, -VERRUNDUNG1_R * 0.02))
            Line((-VERRUNDUNG1_R * 0.02, -VERRUNDUNG1_R * 0.02), (VERRUNDUNG1_R, -VERRUNDUNG1_R * 0.02))
            Line((VERRUNDUNG1_R, -VERRUNDUNG1_R * 0.02), (VERRUNDUNG1_R, 0))
        make_face()
    extrude(amount=30, mode=Mode.SUBTRACT)

    # Skizze11 → Schnitt-Linear austragen2 (cut)
    with BuildSketch(Plane.XY.offset(-22.049560924)):
        with Locations((0.609417277, -6.970434083)):
            Circle(SKIZZE11_R)
        with Locations((34.390582723, -6.970434083)):
            Circle(SKIZZE11_R)
    extrude(amount=SCHNITT_LINEAR_AUSTRAGEN2_DEPTH, mode=Mode.SUBTRACT)

    # Skizze12 → Schnitt-Linear austragen3 (cut)
    with BuildSketch(Plane(origin=(0, 0, -27.049560924), x_dir=(-1, 0, 0), z_dir=(0, 0, -1))):
        with Locations(Location((-17.5, 21.873797801, 0), (0, 0, 90))):
            Circle(SKIZZE12_R)
    extrude(amount=-SCHNITT_LINEAR_AUSTRAGEN3_DEPTH, mode=Mode.SUBTRACT)


solid = part_1.part
